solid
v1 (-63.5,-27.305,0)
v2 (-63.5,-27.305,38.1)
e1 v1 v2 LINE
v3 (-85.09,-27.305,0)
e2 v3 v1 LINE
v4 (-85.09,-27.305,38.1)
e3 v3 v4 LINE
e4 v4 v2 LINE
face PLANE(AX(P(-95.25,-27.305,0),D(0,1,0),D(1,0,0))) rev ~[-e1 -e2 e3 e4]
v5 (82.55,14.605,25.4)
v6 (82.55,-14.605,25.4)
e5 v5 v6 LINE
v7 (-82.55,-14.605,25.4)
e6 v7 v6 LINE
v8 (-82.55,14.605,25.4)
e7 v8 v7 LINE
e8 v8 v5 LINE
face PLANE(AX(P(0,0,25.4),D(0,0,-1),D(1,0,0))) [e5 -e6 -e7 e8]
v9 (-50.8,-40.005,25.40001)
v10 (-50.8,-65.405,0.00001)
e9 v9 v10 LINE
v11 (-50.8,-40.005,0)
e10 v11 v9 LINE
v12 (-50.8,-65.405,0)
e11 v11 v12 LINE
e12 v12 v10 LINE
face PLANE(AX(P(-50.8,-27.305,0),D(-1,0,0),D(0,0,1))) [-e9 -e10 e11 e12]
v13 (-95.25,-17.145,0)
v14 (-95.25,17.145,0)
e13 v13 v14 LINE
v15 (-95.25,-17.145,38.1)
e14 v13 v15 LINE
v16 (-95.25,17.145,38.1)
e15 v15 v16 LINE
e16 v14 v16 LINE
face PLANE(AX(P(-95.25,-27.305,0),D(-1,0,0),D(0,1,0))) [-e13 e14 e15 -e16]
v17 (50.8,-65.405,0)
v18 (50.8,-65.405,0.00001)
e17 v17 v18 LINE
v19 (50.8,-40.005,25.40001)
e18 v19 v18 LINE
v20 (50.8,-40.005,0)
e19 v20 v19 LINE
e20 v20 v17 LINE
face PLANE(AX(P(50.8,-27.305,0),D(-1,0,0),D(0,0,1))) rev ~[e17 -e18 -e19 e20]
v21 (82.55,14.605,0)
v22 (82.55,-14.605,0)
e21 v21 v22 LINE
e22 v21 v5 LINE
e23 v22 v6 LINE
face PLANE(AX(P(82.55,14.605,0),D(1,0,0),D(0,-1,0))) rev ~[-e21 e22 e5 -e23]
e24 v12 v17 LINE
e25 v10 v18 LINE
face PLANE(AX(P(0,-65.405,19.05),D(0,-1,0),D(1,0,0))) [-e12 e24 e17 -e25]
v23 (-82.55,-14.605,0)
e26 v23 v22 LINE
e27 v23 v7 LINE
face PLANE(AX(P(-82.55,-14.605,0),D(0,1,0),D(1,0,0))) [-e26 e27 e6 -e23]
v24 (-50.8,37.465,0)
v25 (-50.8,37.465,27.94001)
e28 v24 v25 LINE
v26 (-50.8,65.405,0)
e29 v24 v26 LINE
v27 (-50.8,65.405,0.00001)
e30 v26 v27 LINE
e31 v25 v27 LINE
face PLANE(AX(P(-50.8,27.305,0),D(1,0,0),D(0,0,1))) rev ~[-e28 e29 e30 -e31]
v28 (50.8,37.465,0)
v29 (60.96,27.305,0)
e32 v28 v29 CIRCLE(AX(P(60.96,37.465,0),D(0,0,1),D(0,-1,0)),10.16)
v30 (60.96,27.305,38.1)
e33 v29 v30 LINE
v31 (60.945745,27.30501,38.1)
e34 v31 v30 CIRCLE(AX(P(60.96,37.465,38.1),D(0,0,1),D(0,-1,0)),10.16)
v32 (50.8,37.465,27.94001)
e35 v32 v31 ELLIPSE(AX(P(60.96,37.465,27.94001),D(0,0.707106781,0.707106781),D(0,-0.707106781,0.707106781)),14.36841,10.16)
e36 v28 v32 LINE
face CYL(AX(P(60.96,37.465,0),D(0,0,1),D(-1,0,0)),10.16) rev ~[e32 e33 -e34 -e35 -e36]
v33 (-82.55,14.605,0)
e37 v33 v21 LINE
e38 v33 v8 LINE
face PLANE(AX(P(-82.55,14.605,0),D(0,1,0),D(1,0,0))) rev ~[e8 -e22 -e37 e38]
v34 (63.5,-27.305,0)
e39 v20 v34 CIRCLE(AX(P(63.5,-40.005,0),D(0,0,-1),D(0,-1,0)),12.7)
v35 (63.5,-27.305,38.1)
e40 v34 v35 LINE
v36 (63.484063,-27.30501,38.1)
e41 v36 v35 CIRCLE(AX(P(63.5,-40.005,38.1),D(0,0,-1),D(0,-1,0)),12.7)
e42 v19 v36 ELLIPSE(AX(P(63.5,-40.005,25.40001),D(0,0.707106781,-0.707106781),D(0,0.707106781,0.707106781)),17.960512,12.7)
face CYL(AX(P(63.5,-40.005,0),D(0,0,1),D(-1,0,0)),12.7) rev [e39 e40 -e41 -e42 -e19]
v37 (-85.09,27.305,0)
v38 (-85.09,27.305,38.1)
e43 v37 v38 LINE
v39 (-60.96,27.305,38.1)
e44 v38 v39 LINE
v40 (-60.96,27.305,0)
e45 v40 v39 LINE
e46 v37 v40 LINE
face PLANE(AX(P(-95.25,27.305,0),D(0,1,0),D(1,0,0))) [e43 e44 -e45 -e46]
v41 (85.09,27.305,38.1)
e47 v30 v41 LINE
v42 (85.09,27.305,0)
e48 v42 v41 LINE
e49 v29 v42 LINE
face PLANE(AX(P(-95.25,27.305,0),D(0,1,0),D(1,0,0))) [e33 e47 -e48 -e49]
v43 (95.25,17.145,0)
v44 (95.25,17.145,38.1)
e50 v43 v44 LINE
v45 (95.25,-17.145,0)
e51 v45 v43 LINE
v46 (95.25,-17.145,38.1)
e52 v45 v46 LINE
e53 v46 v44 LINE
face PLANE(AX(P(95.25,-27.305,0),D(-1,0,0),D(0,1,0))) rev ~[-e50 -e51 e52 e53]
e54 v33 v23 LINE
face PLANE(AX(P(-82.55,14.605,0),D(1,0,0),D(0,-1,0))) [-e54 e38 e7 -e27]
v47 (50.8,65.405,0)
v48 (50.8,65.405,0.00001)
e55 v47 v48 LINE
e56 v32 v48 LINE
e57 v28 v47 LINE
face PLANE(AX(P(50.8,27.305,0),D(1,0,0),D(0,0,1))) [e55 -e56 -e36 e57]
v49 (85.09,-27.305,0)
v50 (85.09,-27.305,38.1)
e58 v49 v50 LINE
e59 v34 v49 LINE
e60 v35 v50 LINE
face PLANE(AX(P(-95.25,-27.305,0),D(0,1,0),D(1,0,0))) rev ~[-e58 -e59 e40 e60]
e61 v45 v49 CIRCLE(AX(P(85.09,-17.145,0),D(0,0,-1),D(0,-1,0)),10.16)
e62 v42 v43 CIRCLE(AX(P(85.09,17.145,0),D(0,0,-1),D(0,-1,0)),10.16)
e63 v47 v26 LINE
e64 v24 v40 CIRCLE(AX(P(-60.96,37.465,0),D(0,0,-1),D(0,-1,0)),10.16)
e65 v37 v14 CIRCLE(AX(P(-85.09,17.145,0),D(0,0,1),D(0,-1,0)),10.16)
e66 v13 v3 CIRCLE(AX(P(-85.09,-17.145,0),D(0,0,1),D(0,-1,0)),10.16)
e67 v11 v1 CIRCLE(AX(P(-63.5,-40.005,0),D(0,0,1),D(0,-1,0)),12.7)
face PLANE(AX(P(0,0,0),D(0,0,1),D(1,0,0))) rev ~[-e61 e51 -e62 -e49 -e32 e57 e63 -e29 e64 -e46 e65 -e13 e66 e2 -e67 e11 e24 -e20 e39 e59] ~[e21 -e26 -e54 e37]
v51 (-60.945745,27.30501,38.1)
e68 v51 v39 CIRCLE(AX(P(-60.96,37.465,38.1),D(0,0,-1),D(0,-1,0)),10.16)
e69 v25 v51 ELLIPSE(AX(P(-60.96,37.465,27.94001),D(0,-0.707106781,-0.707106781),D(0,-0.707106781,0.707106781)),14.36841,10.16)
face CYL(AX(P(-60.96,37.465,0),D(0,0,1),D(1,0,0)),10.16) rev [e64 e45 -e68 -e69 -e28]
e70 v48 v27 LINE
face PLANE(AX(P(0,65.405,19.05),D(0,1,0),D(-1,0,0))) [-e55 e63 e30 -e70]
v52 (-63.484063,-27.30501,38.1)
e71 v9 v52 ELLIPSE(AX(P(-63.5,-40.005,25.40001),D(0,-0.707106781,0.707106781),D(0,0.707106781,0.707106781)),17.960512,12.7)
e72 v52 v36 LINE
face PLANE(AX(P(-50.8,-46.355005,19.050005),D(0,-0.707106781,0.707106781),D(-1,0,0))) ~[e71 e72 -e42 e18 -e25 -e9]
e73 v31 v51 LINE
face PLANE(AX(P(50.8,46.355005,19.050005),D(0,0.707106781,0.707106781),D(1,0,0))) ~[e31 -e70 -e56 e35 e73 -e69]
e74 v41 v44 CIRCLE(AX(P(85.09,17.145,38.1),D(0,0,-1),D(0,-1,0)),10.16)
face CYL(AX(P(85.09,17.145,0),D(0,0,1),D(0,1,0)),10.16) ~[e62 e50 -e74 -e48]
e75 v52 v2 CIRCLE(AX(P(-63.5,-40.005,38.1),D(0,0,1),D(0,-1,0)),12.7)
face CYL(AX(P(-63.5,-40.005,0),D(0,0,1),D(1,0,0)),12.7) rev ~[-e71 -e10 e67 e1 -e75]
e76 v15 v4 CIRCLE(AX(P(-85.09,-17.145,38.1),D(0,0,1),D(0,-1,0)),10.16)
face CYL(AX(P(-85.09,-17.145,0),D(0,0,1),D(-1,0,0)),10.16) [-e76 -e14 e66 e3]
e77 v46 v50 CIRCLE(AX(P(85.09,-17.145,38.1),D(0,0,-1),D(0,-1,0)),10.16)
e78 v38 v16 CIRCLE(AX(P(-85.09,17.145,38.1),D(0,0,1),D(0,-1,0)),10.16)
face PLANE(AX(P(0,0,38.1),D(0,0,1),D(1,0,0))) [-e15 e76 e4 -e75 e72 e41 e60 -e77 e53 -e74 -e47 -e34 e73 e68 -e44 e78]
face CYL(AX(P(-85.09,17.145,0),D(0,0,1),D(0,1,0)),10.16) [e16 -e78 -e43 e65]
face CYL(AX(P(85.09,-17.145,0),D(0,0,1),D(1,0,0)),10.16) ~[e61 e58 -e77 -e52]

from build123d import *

# Parameters (mm, degrees)
F0_W      = 190.5
F0_H      = 54.61
F1_DEPTH  = 38.1
F2_W      = 165.1
F2_H      = 29.21
F3_DEPTH  = 25.4
F4_W      = 101.6
F4_H      = 38.1
F5_DEPTH  = 38.1
F6_SIZE   = 38.09999
F7_R      = 10.16
F8_R      = 10.16
F9_W      = 101.6
F9_H      = 38.1
F10_DEPTH = 38.1
F11_SIZE  = 38.09999
F12_R     = 12.7


# Not quite as in the source:
# - a fillet or chamfer is up to 0.001 mm smaller than in the source, because OpenCascade refuses the exact size


with BuildPart() as f1:
    # F0 (on Top) → F1 (new body)
    with BuildSketch(Plane.XY):
        Rectangle(F0_W, F0_H)
    extrude(amount=F1_DEPTH)

    # F2 (on face) → F3 (cut)
    with BuildSketch(Plane(origin=(0, 0, 0), x_dir=(1, 0, 0), z_dir=(0, 0, -1))):
        Rectangle(F2_W, F2_H)
    extrude(amount=-F3_DEPTH, mode=Mode.SUBTRACT)

    # F4 (on face) → F5 (join)
    with BuildSketch(Plane(origin=(0, 27.305, 0), x_dir=(-1, 0, 0), z_dir=(0, 1, 0))):
        with Locations((0, 19.05)):
            Rectangle(F4_W, F4_H)
    extrude(amount=F5_DEPTH)

    # F6 (size 38.1 in the source; OpenCascade refuses exactly that, so slightly less here)
    f6_edges = [f1.edges().sort_by_distance(p)[0] for p in [
        (0, 65.405, 38.1),
    ]]
    chamfer(f6_edges, length=F6_SIZE)

    # F7 (call 1 of 2: OpenCascade refuses the feature's edges together)
    f7_edges = [f1.edges().sort_by_distance(p)[0] for p in [
        (-50.8, 27.305, 19.05),
    ]]
    fillet(f7_edges, radius=F7_R)

    # F7#2 (call 2 of 2)
    f7_2_edges = [f1.edges().sort_by_distance(p)[0] for p in [
        (50.8, 27.305, 19.05),
    ]]
    fillet(f7_2_edges, radius=F7_R)

    # F8
    f8_edges = [f1.edges().sort_by_distance(p)[0] for p in [
        (-95.25, 27.305, 19.05),
        (-95.25, -27.305, 19.05),
        (95.25, 27.305, 19.05),
        (95.25, -27.305, 19.05),
    ]]
    fillet(f8_edges, radius=F8_R)

    # F9 (on face) → F10 (join)
    with BuildSketch(Plane.XZ.offset(27.305)):
        with Locations((0, 19.05)):
            Rectangle(F9_W, F9_H)
    extrude(amount=F10_DEPTH)

    # F11 (size 38.1 in the source; OpenCascade refuses exactly that, so slightly less here)
    f11_edges = [f1.edges().sort_by_distance(p)[0] for p in [
        (0, -65.405, 38.1),
    ]]
    chamfer(f11_edges, length=F11_SIZE)

    # F12 (call 1 of 2: OpenCascade refuses the feature's edges together)
    f12_edges = [f1.edges().sort_by_distance(p)[0] for p in [
        (50.8, -27.305, 19.05),
    ]]
    fillet(f12_edges, radius=F12_R)

    # F12#2 (call 2 of 2)
    f12_2_edges = [f1.edges().sort_by_distance(p)[0] for p in [
        (-50.8, -27.305, 19.05),
    ]]
    fillet(f12_2_edges, radius=F12_R)


solid = f1.part
